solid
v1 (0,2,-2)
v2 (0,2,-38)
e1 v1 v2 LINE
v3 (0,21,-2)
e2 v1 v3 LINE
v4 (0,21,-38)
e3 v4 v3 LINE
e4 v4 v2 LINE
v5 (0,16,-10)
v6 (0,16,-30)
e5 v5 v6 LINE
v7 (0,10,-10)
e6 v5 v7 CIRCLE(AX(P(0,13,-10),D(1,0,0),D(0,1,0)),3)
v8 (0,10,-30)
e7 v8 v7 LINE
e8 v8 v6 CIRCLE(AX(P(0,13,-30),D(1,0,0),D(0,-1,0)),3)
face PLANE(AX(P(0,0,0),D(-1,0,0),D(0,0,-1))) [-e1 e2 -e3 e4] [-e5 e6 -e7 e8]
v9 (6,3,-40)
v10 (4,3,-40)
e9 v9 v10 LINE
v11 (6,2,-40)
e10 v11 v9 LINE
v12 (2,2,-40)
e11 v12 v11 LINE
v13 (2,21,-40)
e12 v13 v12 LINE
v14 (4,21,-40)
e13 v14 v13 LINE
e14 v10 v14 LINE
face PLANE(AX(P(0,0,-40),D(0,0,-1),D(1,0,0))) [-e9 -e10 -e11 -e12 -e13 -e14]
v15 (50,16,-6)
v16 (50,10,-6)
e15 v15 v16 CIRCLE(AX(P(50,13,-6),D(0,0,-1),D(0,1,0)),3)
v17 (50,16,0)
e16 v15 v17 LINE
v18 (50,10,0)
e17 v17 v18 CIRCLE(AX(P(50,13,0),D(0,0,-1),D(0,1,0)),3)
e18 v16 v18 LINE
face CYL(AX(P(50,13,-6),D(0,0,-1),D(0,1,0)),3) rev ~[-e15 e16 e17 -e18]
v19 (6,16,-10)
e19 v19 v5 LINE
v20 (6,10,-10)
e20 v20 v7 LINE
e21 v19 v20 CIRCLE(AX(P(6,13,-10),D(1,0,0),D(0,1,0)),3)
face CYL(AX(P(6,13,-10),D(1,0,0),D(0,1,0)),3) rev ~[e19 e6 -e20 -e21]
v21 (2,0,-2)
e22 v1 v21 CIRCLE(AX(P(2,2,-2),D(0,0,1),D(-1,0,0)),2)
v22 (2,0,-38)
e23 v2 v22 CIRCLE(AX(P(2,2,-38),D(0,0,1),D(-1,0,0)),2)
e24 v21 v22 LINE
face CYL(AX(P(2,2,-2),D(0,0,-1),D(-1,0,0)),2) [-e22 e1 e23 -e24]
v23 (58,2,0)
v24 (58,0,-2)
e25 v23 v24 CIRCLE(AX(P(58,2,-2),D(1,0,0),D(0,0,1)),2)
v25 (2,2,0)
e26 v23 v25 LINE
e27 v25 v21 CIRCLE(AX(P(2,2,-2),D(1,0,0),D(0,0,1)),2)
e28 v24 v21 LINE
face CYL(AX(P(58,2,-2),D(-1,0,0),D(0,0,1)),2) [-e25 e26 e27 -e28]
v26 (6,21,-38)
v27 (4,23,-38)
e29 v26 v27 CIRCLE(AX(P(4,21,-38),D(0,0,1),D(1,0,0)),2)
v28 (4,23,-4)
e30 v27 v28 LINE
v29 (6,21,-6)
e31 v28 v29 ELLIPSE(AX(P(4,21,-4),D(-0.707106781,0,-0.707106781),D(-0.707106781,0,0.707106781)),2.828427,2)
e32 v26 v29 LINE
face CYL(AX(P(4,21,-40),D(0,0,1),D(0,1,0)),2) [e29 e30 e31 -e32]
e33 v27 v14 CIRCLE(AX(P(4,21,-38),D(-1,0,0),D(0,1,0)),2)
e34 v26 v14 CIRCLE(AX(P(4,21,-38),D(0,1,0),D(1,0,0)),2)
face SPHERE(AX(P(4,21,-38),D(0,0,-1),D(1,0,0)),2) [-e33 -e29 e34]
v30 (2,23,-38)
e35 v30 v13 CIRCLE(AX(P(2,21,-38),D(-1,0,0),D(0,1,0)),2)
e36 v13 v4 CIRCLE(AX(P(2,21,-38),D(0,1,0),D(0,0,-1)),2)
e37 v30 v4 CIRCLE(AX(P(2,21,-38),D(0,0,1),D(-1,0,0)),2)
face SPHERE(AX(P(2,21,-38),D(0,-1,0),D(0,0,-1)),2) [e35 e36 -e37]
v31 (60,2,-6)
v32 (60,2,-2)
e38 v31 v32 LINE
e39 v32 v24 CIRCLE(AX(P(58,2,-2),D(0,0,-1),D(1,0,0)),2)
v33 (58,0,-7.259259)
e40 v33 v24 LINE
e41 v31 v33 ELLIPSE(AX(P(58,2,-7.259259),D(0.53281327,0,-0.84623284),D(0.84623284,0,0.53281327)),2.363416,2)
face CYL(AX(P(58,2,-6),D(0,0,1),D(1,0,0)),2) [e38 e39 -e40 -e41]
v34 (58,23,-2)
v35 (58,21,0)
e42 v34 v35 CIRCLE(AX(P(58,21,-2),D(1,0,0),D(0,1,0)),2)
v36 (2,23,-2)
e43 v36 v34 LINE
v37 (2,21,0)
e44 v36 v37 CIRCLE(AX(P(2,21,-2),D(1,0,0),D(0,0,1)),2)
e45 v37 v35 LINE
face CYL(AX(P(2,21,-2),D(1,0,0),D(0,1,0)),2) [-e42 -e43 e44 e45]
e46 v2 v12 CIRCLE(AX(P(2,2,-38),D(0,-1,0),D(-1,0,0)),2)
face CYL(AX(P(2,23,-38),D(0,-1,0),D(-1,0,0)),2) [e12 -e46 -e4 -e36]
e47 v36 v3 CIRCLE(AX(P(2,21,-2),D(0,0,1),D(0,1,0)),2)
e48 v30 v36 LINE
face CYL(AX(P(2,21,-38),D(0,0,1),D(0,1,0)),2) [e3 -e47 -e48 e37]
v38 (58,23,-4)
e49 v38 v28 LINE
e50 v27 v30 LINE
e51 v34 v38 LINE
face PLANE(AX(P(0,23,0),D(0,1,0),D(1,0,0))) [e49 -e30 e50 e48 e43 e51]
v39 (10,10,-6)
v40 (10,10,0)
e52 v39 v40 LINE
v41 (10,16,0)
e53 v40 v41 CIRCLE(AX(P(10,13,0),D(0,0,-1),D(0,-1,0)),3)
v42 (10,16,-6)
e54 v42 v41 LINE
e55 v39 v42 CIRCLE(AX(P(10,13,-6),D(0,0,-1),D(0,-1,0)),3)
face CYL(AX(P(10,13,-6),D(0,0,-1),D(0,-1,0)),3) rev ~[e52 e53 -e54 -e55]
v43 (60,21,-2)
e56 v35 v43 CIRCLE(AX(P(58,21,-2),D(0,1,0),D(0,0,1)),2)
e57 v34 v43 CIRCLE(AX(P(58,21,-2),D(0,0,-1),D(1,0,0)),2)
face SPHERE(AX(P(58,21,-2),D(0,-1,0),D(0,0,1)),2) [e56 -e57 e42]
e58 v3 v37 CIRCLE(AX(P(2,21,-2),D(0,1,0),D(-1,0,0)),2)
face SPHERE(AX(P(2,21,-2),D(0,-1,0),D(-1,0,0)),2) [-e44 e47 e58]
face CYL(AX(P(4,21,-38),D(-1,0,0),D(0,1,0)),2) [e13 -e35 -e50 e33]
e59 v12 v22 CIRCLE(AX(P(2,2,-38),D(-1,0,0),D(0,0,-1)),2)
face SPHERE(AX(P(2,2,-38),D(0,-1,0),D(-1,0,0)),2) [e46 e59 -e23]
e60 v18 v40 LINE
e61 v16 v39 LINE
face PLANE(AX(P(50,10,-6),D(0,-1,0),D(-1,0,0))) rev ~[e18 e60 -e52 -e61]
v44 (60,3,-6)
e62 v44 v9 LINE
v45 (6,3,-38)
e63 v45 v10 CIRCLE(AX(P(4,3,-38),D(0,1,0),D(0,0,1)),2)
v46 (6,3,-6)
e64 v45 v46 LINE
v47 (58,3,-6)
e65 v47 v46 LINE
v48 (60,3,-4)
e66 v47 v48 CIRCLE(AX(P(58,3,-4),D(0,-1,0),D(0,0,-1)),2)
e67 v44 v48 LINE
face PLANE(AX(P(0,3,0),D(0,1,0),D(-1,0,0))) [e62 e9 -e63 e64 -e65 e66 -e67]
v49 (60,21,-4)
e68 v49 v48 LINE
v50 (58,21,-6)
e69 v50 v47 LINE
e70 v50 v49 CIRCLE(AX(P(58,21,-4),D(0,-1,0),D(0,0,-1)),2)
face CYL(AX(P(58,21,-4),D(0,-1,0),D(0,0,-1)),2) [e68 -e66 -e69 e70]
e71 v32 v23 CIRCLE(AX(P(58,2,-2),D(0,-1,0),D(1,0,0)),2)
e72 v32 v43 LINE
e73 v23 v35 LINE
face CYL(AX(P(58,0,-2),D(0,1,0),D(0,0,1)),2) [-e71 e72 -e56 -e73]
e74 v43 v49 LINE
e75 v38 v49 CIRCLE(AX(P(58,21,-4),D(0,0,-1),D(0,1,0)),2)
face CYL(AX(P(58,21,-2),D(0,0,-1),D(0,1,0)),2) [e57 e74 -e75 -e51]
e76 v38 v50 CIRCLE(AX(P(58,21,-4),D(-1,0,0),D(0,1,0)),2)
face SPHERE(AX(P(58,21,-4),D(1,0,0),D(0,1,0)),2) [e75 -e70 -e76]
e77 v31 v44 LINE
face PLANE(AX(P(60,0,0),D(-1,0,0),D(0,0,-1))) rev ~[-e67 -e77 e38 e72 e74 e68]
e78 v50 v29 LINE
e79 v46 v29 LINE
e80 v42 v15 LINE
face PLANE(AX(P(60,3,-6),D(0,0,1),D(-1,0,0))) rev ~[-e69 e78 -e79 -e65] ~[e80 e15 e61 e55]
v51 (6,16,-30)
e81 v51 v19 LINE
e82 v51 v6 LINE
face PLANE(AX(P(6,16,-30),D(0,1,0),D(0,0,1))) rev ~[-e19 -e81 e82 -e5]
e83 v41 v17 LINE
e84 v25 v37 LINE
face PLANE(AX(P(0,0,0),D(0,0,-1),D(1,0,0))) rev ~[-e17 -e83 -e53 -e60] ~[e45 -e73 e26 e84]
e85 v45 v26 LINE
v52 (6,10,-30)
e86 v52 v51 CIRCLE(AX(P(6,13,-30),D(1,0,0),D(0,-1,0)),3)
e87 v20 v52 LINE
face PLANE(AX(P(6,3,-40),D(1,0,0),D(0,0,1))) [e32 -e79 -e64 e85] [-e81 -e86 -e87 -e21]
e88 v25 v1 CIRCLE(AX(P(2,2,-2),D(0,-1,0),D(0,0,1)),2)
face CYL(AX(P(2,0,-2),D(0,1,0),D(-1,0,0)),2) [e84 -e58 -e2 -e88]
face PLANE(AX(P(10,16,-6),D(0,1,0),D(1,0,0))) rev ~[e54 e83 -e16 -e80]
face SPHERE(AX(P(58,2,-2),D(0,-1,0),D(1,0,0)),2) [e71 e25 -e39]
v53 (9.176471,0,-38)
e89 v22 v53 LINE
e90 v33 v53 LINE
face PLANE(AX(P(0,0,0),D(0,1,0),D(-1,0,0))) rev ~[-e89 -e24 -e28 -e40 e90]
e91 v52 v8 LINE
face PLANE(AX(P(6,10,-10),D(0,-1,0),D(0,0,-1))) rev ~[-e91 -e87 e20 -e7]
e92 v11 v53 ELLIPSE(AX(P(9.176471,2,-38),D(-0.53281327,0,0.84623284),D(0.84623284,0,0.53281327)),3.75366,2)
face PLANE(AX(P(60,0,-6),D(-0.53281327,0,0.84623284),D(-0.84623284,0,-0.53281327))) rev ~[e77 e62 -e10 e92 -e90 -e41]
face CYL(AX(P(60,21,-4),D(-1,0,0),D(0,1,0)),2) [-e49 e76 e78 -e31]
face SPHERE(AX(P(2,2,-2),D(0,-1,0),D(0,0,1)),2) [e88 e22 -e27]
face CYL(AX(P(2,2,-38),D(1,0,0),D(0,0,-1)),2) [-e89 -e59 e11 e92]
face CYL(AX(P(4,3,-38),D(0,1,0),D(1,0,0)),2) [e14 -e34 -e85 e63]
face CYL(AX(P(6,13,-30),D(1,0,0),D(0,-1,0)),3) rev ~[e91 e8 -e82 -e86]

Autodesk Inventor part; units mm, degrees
ref_plane "YZ Plane" through (0, 0, 0) normal (1, 0, 0) x (0, 1, 0)
ref_plane "XZ Plane" through (0, 0, 0) normal (0, 1, 0) x (-1, 0, 0)
ref_plane "XY Plane" through (0, 0, 0) normal (0, 0, 1) x (1, 0, 0)
sketch "Sketch1" plane through (0, 0, 0) normal (0, 1, 0) x (-1, 0, 0)
  line L0 (0, 0) -> (0, -40)
  line L1 (0, 0) -> (40, 0) construction
  line L2 (0, 0) -> (-60, 0)
  line L3 (-6, -40) -> (-6, -6)
  line L4 (-6, -6) -> (-60, -6)
  line L5 (-60, 0) -> (-60, -6)
  line L6 (0, -40) -> (-6, -40)
  line L7 (-60, -6) -> (-6, -40)
  dimension "d0" = 40
  dimension "d1" = 90
  dimension "d2" = 60
  dimension "d3" = 6
extrude "Extrusion1" add sketch "Sketch1" along normal blind 3
sketch "Sketch2" plane through (0, 3, 0) normal (0, 1, 0) x (1, 0, 0)
  line L0 (0, 40) -> (0, 0) projected
  line L1 (0, 0) -> (0, 40)
  line L2 (0, 0) -> (60, 0) projected
  line L3 (60, 0) -> (0, 0)
  line L4 (6, 40) -> (6, 0)
  line L5 (60, 6) -> (6, 6)
  line L6 (60, 6) -> (6, 40) projected
  line L7 (60, 6) -> (60, 0)
  line L8 (6, 40) -> (0, 40)
  dimension "d6" = 6
extrude "Extrusion2" add sketch "Sketch2" along normal blind 20 contours L8 L4 L2 L0 | L4 L5 L7 L2
sketch "Sketch3" plane through (6, 3, -6) normal (1, 0, 0) x (0, 0, -1)
  line L0 (34, 20) -> (-6, 20) projected
  line L1 (-6, 20) -> (4, 20)
  line L2 (4, 20) -> (4, 10)
  line L3 (4, 10) -> (24, 10) construction
  line L4 (4, 7) -> (24, 7)
  line L5 (24, 13) -> (4, 13)
  arc A0 (4, 13) -> (4, 7) centre (4, 10) ccw
  arc A1 (24, 7) -> (24, 13) centre (24, 10) ccw
  point P0 (-6, -3)
  point P1 (14, 10)
  dimension "d9" = 10
  dimension "d10" = 10
  dimension "d11" = 20
  dimension "d12" = 6
extrude "Extrusion3" cut sketch "Sketch3" against normal blind 20
sketch "Sketch4" plane through (60, 3, -6) normal (0, 0, -1) x (-1, 0, 0)
  line L0 (10, 20) -> (10, 10)
  line L1 (10, 10) -> (50, 10) construction
  line L2 (10, 7) -> (50, 7)
  line L3 (50, 13) -> (10, 13)
  arc A0 (10, 13) -> (10, 7) centre (10, 10) ccw
  arc A1 (50, 7) -> (50, 13) centre (50, 10) ccw
  line L4 (60, -3) -> (60, 20) projected
  line L5 (0, 20) -> (54, 20) projected
  point P0 (30, 10)
  dimension "d16" = 10
  dimension "d17" = 40
  dimension "d18" = 6
  dimension "d35" = 10
  dimension "d36" = 13
extrude "Extrusion4" cut sketch "Sketch4" against normal blind 20
fillet "Fillet1" radius 2 3 edges at (0, 11.5, 0) (60, 11.5, 0) (0, 11.5, -40)
fillet "Fillet2" radius 2 2 edges at (33, 23, -6) (6, 23, -23)
fillet "Fillet3" radius 2 11 edges at (59.4142, 23, -0.5858) (60, 23, -3) (60, 22.4142, -5.4142) (60, 12, -6) (0.5858, 23, -0.5858) (0, 23, -20) (0.5858, 23, -39.4142) (3, 23, -40) (5.4142, 22.4142, -40) (6, 12, -40) (30, 23, 0)
fillet "Fillet4" radius 2 7 edges at (0.5858, 0, -39.4142) (4, 0, -40) (0.5858, 0, -0.5858) (30, 0, 0) (59.4142, 0, -0.5858) (60, 0, -4) (0, 0, -20)
properties part number "RightAngle_Bracket_60mm"
